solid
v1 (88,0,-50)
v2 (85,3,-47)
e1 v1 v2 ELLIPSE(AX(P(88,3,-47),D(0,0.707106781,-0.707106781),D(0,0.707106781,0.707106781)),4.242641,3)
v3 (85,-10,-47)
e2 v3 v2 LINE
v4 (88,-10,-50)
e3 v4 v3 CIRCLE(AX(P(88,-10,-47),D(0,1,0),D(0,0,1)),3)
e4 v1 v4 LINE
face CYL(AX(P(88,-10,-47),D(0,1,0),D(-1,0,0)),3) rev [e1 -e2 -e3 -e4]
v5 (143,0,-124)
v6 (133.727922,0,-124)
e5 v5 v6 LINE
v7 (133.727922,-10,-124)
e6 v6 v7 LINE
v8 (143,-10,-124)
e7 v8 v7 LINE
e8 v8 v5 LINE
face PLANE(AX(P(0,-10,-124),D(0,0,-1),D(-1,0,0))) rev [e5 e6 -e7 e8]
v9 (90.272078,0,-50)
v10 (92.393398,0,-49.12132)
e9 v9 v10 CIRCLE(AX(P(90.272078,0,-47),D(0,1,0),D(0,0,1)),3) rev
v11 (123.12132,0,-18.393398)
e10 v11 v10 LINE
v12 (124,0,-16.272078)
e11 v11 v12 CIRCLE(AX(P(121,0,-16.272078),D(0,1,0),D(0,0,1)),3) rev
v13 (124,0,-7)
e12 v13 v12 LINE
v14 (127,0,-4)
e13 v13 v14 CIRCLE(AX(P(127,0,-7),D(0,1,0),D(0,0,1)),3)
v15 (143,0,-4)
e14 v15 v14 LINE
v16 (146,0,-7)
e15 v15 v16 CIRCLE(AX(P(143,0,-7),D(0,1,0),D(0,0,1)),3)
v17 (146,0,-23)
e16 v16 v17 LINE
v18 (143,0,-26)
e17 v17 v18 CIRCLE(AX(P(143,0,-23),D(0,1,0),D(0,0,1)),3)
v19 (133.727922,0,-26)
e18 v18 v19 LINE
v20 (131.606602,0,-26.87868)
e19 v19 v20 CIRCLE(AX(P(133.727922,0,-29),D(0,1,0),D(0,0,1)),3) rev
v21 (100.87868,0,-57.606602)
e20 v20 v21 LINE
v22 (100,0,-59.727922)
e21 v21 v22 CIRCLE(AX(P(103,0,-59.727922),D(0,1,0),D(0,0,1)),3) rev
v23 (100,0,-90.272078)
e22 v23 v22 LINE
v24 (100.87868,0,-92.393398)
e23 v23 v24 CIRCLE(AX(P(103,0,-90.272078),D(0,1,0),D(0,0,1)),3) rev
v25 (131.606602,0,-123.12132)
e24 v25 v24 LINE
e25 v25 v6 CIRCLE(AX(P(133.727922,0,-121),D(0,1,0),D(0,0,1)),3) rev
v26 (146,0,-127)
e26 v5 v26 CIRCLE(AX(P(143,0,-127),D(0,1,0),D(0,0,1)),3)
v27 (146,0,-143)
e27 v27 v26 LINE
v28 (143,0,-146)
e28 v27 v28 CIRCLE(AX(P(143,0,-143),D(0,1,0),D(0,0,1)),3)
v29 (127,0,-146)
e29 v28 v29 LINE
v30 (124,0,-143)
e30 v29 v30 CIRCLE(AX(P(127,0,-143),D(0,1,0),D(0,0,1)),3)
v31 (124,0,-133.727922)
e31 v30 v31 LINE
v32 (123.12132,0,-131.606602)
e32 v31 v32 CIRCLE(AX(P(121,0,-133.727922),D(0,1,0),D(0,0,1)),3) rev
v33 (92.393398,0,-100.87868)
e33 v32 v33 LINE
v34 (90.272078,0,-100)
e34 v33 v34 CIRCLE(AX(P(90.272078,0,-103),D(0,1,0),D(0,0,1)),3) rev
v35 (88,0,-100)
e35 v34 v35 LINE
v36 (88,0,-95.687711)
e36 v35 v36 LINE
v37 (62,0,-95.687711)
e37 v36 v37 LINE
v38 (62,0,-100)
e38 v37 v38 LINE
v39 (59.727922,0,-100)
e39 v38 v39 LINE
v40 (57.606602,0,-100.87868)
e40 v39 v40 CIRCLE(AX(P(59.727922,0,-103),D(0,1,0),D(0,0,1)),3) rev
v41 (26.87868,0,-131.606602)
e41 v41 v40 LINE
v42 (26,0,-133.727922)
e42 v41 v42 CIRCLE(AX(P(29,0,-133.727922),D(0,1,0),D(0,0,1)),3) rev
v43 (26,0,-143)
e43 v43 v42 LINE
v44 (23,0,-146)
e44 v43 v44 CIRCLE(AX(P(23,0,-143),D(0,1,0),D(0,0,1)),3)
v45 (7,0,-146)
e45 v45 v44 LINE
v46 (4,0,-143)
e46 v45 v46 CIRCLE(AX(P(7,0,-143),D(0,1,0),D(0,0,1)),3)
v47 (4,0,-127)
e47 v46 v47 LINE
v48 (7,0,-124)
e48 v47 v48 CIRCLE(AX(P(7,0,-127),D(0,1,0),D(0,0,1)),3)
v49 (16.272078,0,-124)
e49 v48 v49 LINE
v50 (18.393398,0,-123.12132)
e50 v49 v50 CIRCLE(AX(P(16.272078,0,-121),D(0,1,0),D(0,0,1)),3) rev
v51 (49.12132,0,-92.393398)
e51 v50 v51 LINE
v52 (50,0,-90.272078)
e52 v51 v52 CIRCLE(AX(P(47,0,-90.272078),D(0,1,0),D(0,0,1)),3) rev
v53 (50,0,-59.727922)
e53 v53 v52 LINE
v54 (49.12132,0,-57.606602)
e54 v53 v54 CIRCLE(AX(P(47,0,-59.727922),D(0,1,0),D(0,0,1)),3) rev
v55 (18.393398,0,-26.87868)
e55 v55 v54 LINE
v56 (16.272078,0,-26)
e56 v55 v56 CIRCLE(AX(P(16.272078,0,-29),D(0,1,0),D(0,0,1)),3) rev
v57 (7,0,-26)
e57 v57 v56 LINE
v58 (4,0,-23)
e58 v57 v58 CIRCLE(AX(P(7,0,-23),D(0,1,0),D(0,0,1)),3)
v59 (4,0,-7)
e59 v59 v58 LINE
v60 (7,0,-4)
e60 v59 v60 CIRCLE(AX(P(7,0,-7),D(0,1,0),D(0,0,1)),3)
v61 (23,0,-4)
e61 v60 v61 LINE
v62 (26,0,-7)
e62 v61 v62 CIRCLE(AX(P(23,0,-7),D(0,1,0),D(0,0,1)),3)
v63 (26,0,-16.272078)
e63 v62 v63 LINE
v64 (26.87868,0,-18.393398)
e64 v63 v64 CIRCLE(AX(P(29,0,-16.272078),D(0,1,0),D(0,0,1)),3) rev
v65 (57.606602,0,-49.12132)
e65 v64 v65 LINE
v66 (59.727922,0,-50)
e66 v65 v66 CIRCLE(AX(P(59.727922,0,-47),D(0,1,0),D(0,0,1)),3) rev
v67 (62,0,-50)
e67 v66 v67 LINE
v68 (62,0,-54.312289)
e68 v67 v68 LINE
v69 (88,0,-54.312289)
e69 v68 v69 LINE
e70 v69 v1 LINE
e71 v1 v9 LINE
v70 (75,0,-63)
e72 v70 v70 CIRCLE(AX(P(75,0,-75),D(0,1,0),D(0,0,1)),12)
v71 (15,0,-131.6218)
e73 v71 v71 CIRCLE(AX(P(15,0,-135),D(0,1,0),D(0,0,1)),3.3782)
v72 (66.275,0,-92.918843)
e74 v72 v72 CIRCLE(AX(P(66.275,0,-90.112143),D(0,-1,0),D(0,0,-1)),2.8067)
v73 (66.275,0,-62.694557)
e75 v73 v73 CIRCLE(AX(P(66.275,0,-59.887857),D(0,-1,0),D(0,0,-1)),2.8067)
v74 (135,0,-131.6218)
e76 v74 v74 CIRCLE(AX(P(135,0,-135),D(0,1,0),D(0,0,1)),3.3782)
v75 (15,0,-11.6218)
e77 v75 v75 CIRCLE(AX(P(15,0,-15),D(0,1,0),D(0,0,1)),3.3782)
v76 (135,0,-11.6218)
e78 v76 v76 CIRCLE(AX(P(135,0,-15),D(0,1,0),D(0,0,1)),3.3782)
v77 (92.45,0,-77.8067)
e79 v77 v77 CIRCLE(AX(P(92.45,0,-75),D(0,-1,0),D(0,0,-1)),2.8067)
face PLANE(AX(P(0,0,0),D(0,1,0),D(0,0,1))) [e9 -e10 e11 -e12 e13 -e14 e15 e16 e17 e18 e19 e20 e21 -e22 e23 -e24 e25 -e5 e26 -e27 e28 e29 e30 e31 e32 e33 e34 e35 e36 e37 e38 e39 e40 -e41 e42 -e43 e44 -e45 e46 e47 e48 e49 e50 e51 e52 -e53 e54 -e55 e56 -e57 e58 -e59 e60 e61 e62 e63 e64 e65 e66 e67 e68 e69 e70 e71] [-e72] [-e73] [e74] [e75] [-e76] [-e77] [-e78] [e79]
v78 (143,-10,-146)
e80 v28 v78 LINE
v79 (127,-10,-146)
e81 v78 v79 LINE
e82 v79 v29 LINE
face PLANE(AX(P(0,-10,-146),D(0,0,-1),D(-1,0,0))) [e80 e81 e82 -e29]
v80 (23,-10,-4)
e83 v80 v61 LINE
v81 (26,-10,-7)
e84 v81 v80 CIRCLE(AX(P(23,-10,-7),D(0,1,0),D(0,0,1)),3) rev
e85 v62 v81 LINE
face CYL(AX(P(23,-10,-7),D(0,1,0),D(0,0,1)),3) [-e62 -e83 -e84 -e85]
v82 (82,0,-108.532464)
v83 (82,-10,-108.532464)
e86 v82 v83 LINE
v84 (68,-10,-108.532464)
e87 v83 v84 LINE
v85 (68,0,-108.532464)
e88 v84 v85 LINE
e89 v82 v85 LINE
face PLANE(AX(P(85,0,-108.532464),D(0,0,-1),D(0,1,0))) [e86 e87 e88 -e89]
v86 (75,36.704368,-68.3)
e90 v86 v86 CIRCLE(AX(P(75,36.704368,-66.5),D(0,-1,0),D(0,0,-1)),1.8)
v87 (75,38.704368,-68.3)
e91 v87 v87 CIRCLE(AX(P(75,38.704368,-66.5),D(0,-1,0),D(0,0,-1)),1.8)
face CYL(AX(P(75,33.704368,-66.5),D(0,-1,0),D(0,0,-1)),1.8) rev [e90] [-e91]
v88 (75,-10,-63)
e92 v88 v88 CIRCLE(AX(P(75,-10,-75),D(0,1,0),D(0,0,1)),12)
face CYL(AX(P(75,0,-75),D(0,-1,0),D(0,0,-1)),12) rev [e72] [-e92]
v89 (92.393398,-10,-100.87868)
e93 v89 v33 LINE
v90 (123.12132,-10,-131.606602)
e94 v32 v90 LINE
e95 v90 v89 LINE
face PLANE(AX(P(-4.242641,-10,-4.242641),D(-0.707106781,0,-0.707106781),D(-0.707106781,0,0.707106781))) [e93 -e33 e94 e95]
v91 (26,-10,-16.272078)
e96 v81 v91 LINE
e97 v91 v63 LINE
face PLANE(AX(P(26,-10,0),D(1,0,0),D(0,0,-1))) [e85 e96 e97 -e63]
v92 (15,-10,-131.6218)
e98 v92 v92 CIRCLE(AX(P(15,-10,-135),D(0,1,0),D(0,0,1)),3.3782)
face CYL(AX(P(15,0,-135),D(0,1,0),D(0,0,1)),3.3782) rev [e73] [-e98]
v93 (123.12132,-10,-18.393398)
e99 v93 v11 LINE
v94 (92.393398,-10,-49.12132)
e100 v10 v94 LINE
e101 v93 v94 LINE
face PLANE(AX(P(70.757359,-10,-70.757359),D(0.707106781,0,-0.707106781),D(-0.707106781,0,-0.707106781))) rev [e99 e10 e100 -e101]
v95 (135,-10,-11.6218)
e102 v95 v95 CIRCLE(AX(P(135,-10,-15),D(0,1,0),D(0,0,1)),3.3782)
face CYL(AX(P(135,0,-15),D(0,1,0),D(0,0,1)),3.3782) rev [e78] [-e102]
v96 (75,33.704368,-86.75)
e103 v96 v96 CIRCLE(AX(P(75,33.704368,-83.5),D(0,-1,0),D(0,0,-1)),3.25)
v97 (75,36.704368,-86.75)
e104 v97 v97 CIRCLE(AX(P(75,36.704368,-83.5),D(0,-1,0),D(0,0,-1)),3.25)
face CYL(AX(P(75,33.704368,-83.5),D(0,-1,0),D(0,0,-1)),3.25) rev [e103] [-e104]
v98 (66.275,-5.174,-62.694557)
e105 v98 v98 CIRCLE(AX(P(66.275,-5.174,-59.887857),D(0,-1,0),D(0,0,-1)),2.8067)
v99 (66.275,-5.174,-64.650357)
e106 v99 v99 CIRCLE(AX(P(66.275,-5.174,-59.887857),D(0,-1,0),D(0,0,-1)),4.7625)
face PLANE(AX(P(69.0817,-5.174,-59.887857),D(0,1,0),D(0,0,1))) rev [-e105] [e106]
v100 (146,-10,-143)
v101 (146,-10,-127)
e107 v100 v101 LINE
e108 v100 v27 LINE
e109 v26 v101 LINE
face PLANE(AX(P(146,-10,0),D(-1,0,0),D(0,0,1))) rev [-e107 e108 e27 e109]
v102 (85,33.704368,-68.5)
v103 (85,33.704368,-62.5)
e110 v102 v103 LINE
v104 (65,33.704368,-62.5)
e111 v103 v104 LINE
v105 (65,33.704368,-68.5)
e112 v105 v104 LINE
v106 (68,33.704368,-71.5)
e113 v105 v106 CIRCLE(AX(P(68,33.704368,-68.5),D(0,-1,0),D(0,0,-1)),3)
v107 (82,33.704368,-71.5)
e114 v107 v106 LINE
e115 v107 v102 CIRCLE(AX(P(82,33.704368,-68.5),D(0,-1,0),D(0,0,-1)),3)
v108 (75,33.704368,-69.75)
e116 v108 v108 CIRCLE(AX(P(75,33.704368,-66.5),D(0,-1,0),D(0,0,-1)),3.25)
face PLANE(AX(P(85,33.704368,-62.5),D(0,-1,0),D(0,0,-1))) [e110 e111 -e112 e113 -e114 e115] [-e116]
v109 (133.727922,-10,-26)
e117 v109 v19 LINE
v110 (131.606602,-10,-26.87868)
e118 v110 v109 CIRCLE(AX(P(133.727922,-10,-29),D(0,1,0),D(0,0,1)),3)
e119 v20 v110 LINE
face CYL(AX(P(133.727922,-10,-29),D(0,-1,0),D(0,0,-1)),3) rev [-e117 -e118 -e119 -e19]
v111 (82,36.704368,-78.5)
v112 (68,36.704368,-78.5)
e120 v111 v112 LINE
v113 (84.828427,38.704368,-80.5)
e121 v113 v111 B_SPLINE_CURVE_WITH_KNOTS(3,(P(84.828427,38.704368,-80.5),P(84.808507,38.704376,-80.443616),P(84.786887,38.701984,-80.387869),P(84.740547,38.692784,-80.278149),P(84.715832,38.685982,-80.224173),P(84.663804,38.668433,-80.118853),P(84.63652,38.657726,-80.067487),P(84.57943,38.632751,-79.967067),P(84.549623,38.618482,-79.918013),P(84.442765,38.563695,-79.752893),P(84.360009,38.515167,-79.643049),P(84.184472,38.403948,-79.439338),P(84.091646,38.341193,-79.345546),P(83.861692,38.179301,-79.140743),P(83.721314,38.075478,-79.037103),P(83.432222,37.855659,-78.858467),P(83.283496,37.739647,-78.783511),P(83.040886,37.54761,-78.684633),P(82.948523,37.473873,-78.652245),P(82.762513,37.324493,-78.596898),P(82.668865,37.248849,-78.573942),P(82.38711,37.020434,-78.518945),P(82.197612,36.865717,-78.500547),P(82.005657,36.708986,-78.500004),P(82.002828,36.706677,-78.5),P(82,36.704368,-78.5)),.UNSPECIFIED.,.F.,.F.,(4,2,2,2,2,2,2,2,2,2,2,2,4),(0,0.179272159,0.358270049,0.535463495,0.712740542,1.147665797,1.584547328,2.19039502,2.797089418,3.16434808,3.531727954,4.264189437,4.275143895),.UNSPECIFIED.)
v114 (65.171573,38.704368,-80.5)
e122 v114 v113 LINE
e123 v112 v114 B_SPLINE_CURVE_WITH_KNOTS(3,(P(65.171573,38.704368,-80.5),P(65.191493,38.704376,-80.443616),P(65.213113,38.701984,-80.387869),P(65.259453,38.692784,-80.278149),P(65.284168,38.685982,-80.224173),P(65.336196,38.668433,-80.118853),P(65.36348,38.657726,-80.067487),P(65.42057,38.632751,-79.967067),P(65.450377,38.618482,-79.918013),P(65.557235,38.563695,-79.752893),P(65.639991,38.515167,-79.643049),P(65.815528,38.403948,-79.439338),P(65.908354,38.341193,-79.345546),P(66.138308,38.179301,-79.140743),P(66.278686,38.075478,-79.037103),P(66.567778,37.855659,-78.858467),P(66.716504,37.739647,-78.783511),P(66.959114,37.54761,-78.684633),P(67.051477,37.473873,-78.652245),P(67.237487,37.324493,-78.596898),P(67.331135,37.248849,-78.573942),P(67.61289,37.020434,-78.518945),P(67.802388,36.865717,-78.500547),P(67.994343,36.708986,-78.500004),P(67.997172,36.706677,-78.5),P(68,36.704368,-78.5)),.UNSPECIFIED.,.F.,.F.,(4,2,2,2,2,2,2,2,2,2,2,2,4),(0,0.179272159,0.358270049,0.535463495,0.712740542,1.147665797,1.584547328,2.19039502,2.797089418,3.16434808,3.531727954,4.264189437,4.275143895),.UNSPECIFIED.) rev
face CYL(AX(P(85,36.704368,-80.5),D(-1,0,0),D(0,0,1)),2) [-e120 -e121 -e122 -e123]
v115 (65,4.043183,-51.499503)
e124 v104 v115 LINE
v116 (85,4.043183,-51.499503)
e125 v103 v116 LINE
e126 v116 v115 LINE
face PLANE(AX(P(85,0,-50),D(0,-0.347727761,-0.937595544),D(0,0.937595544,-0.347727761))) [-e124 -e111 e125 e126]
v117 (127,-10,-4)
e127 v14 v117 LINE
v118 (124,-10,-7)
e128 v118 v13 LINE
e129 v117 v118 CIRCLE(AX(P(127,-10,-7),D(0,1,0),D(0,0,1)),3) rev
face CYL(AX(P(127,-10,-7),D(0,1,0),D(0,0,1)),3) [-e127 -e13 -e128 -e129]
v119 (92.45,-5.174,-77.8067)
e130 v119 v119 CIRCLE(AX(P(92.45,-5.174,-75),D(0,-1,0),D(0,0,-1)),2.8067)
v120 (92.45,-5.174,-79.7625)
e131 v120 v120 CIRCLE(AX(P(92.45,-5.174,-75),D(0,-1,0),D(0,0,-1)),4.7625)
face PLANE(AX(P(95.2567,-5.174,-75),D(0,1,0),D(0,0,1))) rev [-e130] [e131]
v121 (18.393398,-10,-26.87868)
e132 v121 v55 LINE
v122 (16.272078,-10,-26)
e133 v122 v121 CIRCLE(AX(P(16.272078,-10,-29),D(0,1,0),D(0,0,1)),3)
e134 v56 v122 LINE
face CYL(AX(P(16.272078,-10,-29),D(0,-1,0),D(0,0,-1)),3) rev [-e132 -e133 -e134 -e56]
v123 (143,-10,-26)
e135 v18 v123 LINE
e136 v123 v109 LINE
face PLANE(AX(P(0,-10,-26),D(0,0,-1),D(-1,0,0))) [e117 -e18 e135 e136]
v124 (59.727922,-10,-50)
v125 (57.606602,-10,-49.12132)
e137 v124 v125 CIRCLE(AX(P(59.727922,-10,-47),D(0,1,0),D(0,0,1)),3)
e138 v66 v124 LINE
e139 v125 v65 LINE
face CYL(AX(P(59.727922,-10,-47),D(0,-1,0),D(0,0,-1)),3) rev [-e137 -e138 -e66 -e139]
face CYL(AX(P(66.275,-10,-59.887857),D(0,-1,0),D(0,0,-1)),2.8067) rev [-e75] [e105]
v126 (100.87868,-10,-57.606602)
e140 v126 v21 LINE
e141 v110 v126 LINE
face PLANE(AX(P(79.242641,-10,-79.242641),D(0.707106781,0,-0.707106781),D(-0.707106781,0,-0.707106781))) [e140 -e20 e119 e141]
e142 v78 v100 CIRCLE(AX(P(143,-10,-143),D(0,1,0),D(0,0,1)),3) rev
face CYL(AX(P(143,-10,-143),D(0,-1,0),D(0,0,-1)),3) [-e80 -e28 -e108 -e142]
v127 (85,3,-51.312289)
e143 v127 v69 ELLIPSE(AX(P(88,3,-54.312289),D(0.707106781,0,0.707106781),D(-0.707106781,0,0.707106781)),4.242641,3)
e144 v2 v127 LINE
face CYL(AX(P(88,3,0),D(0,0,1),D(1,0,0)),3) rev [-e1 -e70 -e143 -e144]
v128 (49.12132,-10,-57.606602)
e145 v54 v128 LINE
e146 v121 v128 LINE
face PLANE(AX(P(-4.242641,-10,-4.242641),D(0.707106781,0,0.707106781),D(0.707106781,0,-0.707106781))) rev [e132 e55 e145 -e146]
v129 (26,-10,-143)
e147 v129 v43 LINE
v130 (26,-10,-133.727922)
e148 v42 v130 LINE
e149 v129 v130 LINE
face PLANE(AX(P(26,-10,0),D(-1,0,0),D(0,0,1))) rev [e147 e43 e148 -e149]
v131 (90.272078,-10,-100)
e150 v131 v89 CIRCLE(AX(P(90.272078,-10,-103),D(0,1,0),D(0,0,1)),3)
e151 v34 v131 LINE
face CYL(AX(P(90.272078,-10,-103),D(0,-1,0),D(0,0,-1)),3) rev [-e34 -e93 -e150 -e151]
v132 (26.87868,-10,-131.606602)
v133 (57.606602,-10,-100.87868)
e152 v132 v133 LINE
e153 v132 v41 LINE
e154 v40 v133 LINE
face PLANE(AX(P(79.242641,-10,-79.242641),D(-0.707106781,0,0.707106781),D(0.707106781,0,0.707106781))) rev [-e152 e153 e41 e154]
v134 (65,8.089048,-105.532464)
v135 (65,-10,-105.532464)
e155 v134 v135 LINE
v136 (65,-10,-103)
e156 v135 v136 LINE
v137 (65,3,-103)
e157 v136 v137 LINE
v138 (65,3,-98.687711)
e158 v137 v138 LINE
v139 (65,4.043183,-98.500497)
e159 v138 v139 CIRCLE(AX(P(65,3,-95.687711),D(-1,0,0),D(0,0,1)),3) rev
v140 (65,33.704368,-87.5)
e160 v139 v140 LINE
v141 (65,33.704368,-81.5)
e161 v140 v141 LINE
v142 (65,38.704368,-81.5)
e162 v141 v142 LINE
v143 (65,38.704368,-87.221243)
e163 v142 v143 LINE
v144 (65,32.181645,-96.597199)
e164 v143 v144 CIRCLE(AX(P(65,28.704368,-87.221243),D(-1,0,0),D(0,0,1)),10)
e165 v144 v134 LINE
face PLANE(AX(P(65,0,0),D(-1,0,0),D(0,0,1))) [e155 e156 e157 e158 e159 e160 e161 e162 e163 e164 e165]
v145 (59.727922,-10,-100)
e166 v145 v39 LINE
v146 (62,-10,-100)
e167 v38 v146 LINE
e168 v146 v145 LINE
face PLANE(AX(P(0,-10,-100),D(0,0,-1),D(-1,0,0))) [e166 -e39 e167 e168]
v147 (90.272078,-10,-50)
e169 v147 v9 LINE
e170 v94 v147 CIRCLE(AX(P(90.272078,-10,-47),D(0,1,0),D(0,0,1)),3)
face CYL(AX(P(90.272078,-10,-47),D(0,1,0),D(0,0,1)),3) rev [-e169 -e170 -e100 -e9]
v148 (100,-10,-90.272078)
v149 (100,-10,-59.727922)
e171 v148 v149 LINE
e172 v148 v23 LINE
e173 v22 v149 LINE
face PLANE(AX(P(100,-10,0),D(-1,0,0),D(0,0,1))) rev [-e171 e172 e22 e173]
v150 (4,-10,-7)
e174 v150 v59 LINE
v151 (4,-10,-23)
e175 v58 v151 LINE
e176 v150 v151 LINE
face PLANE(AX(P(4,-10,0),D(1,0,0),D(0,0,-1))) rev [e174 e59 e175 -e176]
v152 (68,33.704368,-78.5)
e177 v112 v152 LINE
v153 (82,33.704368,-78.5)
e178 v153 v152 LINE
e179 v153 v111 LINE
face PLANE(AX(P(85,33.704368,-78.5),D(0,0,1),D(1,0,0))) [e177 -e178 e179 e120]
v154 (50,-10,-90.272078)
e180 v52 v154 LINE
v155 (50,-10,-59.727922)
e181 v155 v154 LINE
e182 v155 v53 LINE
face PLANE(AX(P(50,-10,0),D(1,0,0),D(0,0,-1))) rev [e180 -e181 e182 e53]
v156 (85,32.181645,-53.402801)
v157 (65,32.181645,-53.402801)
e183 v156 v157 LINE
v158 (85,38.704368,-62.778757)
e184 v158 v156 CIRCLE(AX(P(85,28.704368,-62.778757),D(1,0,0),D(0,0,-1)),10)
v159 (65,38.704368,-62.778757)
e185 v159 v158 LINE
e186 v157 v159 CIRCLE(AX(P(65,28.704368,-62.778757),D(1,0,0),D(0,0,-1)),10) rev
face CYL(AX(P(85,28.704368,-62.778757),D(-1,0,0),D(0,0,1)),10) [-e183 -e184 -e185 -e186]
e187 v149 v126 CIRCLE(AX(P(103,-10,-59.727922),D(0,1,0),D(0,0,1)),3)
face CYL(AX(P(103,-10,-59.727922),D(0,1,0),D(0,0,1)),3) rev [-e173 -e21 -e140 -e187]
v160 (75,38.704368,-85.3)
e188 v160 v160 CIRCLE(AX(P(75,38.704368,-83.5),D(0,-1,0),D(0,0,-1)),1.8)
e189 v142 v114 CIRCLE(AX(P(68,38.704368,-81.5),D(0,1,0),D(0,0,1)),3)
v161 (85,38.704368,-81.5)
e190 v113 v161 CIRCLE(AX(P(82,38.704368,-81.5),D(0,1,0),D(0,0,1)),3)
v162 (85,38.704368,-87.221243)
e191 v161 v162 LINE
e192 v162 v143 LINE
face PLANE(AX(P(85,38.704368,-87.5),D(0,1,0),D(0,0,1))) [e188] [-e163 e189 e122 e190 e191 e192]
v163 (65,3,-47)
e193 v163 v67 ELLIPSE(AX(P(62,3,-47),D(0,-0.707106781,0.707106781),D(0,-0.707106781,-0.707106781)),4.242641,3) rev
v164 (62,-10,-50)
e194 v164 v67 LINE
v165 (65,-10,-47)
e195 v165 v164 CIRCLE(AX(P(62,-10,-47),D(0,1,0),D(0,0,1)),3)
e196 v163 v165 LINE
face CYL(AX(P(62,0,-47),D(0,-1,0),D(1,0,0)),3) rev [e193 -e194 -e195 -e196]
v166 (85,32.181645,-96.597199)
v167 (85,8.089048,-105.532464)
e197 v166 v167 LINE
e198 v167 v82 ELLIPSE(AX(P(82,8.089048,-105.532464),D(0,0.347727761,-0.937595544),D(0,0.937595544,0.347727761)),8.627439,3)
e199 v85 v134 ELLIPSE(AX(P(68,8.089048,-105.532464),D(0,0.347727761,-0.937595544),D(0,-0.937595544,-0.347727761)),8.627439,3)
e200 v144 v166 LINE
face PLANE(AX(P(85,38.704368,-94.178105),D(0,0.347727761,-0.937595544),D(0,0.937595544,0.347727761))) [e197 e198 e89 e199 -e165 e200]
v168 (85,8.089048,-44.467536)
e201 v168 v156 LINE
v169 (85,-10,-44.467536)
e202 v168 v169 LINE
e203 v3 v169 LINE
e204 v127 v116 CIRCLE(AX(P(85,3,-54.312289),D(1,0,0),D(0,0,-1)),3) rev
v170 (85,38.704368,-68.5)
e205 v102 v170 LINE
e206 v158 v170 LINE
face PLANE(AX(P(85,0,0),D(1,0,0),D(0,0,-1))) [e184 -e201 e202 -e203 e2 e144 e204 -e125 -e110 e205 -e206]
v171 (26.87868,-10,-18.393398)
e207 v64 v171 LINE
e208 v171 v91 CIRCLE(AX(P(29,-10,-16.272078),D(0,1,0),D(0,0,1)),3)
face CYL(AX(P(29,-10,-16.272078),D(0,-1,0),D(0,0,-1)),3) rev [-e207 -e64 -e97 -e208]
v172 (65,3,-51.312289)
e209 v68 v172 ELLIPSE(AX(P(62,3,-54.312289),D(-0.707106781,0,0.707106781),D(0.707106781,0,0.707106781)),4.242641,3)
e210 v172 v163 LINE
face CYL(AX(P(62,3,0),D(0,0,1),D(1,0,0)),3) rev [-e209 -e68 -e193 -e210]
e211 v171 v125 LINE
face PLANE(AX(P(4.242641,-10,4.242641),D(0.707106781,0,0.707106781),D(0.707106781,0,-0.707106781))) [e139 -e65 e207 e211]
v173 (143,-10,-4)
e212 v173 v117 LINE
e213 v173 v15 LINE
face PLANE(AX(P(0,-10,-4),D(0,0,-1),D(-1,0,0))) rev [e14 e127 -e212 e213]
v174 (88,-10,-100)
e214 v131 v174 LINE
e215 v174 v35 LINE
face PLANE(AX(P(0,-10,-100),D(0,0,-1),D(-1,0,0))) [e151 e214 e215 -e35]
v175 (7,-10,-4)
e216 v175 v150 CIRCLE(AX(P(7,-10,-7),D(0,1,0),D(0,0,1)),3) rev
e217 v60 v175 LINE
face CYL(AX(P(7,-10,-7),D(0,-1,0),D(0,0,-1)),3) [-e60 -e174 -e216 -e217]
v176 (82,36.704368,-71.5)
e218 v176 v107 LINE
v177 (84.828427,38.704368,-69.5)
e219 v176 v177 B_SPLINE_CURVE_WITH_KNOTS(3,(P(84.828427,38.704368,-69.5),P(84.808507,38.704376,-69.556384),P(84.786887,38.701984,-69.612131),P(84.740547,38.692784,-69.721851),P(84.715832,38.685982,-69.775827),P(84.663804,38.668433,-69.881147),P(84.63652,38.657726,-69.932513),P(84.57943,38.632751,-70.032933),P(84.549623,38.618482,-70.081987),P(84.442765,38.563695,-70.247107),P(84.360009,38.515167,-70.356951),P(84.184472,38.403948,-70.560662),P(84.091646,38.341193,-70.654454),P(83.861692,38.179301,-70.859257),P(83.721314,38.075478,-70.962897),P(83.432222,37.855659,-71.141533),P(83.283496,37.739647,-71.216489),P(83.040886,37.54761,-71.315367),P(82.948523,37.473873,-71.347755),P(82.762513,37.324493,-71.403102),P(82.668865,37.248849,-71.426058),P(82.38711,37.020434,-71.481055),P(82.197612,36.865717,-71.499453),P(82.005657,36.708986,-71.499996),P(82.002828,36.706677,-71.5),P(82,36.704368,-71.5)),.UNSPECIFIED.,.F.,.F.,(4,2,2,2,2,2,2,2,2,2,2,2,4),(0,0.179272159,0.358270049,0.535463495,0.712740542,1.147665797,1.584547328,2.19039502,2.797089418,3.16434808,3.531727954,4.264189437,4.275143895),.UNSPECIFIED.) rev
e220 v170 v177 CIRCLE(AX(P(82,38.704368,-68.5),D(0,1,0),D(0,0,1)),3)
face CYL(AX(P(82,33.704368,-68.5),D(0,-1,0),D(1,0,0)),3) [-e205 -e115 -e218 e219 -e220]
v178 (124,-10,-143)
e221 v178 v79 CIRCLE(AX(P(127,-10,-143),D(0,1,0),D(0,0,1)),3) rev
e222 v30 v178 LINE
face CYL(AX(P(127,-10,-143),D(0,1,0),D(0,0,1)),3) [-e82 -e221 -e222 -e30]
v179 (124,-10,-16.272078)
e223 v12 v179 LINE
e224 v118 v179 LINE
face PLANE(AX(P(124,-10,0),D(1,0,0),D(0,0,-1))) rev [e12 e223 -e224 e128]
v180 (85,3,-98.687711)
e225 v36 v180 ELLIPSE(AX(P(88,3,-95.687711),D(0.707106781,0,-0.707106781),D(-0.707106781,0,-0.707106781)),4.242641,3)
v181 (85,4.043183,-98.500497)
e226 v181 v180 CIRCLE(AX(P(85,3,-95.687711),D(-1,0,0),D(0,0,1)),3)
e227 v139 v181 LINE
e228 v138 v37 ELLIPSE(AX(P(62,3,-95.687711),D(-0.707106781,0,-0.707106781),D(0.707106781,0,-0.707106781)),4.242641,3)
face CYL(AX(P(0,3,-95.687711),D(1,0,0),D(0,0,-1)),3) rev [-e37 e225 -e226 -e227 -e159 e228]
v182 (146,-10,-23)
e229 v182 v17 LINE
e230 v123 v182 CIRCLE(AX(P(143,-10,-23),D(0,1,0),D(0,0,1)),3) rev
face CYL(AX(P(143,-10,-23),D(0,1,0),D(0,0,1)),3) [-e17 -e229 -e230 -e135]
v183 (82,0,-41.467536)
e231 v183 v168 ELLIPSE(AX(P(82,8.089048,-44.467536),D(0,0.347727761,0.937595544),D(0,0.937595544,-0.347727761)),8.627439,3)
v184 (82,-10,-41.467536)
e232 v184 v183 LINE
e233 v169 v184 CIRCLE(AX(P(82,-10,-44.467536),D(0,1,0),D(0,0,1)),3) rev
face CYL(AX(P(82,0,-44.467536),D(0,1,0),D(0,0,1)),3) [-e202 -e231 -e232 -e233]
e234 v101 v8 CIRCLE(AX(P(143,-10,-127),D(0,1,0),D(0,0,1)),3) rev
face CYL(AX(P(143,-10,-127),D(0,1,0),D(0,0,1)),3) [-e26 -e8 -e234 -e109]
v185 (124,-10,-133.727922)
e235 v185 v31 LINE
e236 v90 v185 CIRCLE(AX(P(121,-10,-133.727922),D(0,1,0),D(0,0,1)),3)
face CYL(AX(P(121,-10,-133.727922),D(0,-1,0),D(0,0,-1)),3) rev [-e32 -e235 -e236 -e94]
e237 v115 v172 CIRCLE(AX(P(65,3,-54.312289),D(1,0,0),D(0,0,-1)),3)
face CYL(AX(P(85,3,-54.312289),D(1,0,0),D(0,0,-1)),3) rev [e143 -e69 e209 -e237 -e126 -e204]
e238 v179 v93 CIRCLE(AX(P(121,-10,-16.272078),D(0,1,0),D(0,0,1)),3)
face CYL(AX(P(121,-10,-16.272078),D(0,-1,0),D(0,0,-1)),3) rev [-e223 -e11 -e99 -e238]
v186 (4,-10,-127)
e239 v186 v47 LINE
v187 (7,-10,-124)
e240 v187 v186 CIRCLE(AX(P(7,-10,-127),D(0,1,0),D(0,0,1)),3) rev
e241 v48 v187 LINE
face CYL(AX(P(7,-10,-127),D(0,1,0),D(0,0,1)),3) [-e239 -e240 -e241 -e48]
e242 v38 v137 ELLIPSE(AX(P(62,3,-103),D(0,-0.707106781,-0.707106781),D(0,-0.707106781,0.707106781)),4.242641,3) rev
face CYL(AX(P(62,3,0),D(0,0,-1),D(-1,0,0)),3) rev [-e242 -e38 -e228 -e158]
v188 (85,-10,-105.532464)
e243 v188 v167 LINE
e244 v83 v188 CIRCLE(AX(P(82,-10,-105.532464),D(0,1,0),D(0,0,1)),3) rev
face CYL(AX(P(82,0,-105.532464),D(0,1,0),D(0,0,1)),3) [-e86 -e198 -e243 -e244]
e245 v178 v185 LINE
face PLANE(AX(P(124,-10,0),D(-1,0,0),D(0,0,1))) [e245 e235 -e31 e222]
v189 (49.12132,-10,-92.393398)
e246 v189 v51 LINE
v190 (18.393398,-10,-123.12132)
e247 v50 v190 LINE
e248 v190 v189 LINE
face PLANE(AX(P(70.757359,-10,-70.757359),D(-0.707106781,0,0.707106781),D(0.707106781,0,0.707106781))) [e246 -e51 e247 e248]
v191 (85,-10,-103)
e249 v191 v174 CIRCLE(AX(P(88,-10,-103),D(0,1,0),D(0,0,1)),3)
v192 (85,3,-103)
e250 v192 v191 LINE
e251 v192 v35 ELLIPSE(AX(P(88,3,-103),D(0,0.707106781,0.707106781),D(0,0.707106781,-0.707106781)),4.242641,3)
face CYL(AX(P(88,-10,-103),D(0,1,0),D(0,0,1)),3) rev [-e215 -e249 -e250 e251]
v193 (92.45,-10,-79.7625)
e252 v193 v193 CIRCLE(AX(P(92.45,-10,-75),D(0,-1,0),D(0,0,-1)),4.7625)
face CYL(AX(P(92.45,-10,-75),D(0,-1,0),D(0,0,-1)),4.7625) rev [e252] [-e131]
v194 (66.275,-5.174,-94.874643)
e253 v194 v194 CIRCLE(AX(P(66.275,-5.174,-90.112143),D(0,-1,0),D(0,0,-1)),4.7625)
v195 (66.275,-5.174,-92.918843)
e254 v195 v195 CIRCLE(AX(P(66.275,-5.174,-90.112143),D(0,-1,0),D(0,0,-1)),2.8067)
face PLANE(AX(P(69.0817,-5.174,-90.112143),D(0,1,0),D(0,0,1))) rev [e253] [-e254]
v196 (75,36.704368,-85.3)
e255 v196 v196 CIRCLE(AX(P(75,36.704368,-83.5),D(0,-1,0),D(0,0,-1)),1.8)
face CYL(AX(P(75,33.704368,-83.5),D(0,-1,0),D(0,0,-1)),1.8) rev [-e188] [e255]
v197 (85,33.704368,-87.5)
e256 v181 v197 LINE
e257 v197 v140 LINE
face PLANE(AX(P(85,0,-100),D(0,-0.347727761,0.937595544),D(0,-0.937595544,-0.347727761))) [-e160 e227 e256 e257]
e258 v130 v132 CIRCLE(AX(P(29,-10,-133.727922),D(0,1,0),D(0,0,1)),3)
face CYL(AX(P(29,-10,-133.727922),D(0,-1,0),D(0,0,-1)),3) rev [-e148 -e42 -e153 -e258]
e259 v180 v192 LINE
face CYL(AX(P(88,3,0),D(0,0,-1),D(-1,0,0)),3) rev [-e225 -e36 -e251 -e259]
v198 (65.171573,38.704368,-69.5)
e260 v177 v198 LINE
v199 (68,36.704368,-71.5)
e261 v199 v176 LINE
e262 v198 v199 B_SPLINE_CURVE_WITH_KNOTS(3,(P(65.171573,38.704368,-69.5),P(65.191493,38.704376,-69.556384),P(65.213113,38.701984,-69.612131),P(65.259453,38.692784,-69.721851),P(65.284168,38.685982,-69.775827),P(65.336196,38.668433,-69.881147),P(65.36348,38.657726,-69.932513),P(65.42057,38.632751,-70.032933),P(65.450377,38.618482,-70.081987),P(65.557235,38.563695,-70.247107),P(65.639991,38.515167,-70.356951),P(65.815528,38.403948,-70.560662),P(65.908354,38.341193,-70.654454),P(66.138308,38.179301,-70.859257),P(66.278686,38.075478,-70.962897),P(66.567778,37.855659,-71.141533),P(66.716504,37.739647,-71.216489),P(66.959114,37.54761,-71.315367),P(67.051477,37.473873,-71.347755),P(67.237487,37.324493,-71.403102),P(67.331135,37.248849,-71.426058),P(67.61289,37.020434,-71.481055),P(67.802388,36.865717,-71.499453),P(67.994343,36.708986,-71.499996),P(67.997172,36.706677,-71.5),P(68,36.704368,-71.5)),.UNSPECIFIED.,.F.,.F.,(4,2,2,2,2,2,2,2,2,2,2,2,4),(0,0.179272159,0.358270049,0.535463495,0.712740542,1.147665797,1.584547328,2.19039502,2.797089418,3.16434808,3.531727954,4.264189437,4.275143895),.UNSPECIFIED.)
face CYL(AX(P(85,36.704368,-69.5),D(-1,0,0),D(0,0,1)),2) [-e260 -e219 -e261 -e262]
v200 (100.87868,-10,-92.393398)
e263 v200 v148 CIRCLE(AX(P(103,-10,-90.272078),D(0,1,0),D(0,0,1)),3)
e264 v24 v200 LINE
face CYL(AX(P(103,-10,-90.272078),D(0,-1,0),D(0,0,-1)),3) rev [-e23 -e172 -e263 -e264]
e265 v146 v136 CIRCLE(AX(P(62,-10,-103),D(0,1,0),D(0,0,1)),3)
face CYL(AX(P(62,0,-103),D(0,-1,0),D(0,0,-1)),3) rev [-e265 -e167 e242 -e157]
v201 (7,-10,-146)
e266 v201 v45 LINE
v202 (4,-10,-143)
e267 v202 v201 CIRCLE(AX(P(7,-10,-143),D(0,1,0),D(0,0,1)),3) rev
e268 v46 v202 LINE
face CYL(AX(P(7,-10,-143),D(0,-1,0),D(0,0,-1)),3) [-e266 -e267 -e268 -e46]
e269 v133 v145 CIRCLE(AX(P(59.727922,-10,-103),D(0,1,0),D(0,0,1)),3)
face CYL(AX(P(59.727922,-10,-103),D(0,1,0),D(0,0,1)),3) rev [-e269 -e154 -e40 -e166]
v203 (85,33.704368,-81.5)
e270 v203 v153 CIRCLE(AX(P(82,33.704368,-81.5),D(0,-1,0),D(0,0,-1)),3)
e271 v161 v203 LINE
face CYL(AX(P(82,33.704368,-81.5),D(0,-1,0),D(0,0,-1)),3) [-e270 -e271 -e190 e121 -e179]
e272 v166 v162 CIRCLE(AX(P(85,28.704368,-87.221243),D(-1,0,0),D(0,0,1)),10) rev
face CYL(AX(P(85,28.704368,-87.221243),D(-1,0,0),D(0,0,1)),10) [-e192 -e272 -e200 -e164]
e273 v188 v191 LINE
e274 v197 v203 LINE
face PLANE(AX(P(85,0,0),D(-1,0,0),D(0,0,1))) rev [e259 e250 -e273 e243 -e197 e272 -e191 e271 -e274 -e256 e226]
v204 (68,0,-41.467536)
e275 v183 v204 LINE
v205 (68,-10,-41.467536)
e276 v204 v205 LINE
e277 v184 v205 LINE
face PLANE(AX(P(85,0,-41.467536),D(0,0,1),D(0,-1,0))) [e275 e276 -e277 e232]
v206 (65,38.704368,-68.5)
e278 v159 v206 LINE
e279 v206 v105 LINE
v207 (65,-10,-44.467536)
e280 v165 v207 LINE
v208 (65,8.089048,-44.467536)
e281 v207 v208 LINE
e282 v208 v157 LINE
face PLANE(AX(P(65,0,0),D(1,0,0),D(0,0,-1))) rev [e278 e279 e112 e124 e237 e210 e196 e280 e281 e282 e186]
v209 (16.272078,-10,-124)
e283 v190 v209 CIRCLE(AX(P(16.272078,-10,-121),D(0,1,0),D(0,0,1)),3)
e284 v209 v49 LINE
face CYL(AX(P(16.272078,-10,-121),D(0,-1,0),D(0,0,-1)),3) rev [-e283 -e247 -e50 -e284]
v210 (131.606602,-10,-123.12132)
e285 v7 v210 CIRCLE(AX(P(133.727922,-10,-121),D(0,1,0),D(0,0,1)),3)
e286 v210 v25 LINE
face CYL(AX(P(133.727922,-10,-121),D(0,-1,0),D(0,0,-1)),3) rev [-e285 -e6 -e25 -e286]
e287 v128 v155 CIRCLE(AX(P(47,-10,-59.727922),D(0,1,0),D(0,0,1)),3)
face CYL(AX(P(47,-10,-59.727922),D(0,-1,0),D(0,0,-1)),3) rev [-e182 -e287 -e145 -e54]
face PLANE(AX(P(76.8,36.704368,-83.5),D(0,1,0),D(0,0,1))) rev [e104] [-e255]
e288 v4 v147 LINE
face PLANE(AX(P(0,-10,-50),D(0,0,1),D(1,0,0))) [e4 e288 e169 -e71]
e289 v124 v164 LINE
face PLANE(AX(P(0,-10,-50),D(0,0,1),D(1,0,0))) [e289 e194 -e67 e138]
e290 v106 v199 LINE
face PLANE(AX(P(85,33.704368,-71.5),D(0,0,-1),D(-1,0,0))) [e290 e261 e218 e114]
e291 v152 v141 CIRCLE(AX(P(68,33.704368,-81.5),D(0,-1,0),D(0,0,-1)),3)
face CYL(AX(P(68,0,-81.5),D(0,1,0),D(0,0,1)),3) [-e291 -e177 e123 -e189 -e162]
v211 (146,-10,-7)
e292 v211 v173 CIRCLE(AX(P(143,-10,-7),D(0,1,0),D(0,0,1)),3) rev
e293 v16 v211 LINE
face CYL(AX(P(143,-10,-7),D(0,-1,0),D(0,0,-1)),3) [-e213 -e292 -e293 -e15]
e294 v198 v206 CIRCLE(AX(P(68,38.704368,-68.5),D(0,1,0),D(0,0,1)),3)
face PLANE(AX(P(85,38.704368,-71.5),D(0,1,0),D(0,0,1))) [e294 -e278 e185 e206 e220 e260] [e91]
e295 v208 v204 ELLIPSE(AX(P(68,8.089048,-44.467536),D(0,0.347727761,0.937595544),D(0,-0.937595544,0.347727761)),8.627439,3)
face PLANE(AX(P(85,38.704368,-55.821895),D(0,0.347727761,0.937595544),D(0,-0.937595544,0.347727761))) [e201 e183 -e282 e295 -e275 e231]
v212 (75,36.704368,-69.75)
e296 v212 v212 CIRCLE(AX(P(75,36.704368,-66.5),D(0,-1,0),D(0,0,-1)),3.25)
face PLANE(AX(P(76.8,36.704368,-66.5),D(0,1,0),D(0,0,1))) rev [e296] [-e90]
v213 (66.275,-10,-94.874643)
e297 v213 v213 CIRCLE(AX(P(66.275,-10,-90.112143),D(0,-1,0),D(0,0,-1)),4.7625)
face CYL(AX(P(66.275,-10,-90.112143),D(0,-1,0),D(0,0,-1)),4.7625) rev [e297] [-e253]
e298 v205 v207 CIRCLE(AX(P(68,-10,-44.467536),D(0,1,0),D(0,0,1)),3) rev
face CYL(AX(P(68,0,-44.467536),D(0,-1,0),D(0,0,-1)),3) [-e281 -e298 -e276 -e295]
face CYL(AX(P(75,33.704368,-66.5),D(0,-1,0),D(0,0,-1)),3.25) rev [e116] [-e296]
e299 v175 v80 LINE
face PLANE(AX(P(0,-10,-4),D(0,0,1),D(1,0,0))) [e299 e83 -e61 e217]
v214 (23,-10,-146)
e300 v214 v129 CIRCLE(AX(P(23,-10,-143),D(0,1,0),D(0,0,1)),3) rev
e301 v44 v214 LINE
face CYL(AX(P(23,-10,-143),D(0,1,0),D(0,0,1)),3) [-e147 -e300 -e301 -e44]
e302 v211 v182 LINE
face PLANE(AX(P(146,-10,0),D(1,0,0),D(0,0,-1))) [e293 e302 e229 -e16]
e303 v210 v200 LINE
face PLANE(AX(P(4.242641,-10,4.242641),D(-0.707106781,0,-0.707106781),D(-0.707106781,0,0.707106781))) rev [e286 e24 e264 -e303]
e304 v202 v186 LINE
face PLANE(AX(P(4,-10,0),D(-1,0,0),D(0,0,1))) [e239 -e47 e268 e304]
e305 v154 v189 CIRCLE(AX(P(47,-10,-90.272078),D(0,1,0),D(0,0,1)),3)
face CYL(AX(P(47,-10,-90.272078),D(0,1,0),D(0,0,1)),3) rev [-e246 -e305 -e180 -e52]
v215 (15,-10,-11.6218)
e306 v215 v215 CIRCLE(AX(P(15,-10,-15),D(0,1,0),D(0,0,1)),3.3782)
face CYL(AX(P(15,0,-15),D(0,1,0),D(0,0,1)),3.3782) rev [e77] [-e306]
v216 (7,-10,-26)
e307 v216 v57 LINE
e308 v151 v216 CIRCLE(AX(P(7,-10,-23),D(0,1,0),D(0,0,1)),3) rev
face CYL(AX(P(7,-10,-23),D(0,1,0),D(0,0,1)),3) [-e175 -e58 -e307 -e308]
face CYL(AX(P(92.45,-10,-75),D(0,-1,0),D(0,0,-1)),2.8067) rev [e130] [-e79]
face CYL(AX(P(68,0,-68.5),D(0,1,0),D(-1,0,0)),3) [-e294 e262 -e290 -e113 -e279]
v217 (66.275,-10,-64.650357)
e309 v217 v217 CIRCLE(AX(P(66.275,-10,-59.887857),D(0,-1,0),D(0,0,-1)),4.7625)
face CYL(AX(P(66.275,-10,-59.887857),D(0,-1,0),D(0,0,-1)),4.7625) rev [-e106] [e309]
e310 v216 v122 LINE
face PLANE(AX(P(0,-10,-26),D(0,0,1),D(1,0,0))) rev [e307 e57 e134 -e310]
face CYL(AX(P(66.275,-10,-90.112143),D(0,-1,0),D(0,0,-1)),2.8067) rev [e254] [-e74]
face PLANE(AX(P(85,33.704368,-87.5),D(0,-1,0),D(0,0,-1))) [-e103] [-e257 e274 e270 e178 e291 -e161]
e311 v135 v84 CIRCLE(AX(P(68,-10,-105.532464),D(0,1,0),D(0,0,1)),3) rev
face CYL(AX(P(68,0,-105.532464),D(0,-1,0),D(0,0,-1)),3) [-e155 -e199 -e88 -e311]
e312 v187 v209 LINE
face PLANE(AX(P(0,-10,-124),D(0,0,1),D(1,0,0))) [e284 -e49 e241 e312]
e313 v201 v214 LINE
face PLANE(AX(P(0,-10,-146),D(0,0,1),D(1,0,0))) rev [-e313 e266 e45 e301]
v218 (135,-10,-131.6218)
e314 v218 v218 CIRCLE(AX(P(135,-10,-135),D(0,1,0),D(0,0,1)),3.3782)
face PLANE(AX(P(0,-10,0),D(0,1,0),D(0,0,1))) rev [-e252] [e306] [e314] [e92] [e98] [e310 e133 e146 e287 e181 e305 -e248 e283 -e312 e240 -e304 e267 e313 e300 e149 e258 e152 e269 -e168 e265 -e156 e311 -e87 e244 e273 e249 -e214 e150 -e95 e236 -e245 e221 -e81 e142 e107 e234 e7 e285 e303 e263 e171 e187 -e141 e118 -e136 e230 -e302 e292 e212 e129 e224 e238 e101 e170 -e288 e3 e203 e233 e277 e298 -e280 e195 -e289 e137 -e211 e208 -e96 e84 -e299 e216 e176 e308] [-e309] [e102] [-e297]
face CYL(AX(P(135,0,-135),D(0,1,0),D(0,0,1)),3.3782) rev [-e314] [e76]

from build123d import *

# Parameters (mm, degrees)
SKETCH1_W                                       = 22
SKETCH1_H                                       = 22
BOSS_EXTRUDE1_DEPTH                             = 10
F_1_4_CLEARANCE_HOLE1_D                         = 6.7564
SKETCH6_R                                       = 4
CUT_EXTRUDE1_DEPTH                              = 207.717198123
SKETCH7_R                                       = 12
CUT_EXTRUDE2_DEPTH                              = 207.717198123
CBORE_FOR_10_SOCKET_HEAD_CAP_SCREW1_D           = 5.6134
CBORE_FOR_10_SOCKET_HEAD_CAP_SCREW1_CBORE_D     = 9.525
CBORE_FOR_10_SOCKET_HEAD_CAP_SCREW1_CBORE_DEPTH = 4.826
BOSS_EXTRUDE2_DEPTH                             = 10
BOSS_EXTRUDE2_DEPTH_BACK                        = 10
CBORE_FOR_M3_SHCS1_D                            = 3.6
CBORE_FOR_M3_SHCS1_CBORE_D                      = 6.5
CBORE_FOR_M3_SHCS1_CBORE_DEPTH                  = 3
FILLET1_R                                       = 3
FILLET2_R                                       = 3
FILLET3_R                                       = 10
FILLET4_R                                       = 2


with BuildPart() as part:
    # Sketch1 → Boss-Extrude1 (new body)
    with BuildSketch(Plane(origin=(0, 0, 0), x_dir=(1, 0, 0), z_dir=(0, 1, 0))):
        with Locations((15, 15)):
            Rectangle(SKETCH1_W, SKETCH1_H)
        Polygon((50, 50), (50, 58.485281374), (17.514718626, 26), (26, 26), (26, 17.514718626), (58.485281374, 50), align=None)
        Polygon((50, 75), (50, 100), (75, 100), (100, 100), (100, 50), (75, 50), (50, 50), align=None)
        Polygon((100, 50), (91.514718626, 50), (124, 17.514718626), (124, 26), (132.485281374, 26), (100, 58.485281374), align=None)
        with Locations((135, 15)):
            Rectangle(SKETCH1_W, SKETCH1_H)
        with Locations((135, 135)):
            Rectangle(SKETCH1_W, SKETCH1_H)
        Polygon((124, 132.485281374), (91.514718626, 100), (100, 100), (100, 91.514718626), (132.485281374, 124), (124, 124), align=None)
        Polygon((17.514718626, 124), (50, 91.514718626), (50, 100), (58.485281374, 100), (26, 132.485281374), (26, 124), align=None)
        with Locations((15, 135)):
            Rectangle(SKETCH1_W, SKETCH1_H)
    extrude(amount=-BOSS_EXTRUDE1_DEPTH)

    # 1/4 Clearance Hole1 (through all)
    with Locations(Plane(origin=(0, 0, 0), x_dir=(1, 0, 0), z_dir=(0, 1, 0))):
        with Locations((15, 15), (15, 135), (135, 135), (135, 15)):
            Hole(F_1_4_CLEARANCE_HOLE1_D / 2)

    # Sketch6 → Cut-Extrude1 (cut, through all)
    with BuildSketch(Plane.XZ.offset(10)):
        with Locations(Location((75, -75, 0), (0, 0, 270))):
            Circle(SKETCH6_R)
    extrude(amount=-CUT_EXTRUDE1_DEPTH, mode=Mode.SUBTRACT)

    # Sketch7 → Cut-Extrude2 (cut, through all)
    with BuildSketch(Plane(origin=(0, -10, 0), x_dir=(1, 0, 0), z_dir=(0, 1, 0))):
        with Locations(Location((75, 75, 0), (0, 0, 270))):
            Circle(SKETCH7_R)
    extrude(amount=CUT_EXTRUDE2_DEPTH, mode=Mode.SUBTRACT)

    # CBORE for #10 Socket Head Cap Screw1 (through all)
    with Locations(Plane(origin=(0, -10, 0), x_dir=(-1, 0, 0), z_dir=(0, -1, 0))):
        with Locations((-92.45, 75), (-66.275, 59.887856704), (-66.275, 90.112143296)):
            CounterBoreHole(CBORE_FOR_10_SOCKET_HEAD_CAP_SCREW1_D / 2, CBORE_FOR_10_SOCKET_HEAD_CAP_SCREW1_CBORE_D / 2, CBORE_FOR_10_SOCKET_HEAD_CAP_SCREW1_CBORE_DEPTH)

    # Sketch10 → Boss-Extrude2 (add, two sides: drawn at the far end of the back side and taken through both)
    with BuildSketch(Plane.ZY.offset(-75).offset(-BOSS_EXTRUDE2_DEPTH_BACK)):
        Polygon((-100, -10), (-100, 0), (-87.5, 33.704367651), (-78.5, 33.704367651), (-78.5, 38.704367651), (-87.5, 38.704367651), (-94.178104684, 38.704367651), (-108.532463759, 0), (-108.532463759, -10), align=None)
        Polygon((-71.5, 33.704367651), (-71.5, 38.704367651), (-62.5, 38.704367651), (-55.821895316, 38.704367651), (-41.467536241, 0), (-41.467536241, -10), (-50, -10), (-50, 0), (-62.5, 33.704367651), align=None)
    extrude(amount=BOSS_EXTRUDE2_DEPTH + BOSS_EXTRUDE2_DEPTH_BACK)

    # CBORE for M3 SHCS1 (through all)
    with Locations(Plane(origin=(0, 33.704367651, 0), x_dir=(-1, 0, 0), z_dir=(0, -1, 0))):
        with Locations((-75, 83.5), (-75, 66.5)):
            CounterBoreHole(CBORE_FOR_M3_SHCS1_D / 2, CBORE_FOR_M3_SHCS1_CBORE_D / 2, CBORE_FOR_M3_SHCS1_CBORE_DEPTH)

    # Fillet1
    fillet1_edges = [part.edges().sort_by_distance(p)[0] for p in [
        (85, -5, -108.532463759),
        (85, 36.204367651, -78.5),
        (85, -5, -100),
        (65, -5, -100),
        (65, 36.204367651, -78.5),
        (65, -5, -108.532463759),
        (85, -5, -50),
        (85, 36.204367651, -71.5),
        (85, -5, -41.467536241),
        (65, -5, -41.467536241),
        (65, 36.204367651, -71.5),
        (65, -5, -50),
        (100, -5, -58.485281374),
        (132.485281374, -5, -26),
        (146, -5, -26),
        (146, -5, -4),
        (124, -5, -4),
        (124, -5, -17.514718626),
        (91.514718626, -5, -50),
        (58.485281374, -5, -50),
        (26, -5, -17.514718626),
        (26, -5, -4),
        (4, -5, -4),
        (4, -5, -26),
        (17.514718626, -5, -26),
        (50, -5, -58.485281374),
        (50, -5, -91.514718626),
        (17.514718626, -5, -124),
        (4, -5, -124),
        (4, -5, -146),
        (26, -5, -146),
        (26, -5, -132.485281374),
        (58.485281374, -5, -100),
        (91.514718626, -5, -100),
        (124, -5, -132.485281374),
        (124, -5, -146),
        (146, -5, -146),
        (146, -5, -124),
        (132.485281374, -5, -124),
        (100, -5, -91.514718626),
    ]]
    fillet(fillet1_edges, radius=FILLET1_R)

    # Fillet2
    fillet2_edges = [part.edges().sort_by_distance(p)[0] for p in [
        (85, 0, -48.5),
        (85, 0, -101.5),
        (65, 0, -48.5),
        (65, 0, -101.5),
        (75, 0, -50),
        (75, 0, -100),
    ]]
    fillet(fillet2_edges, radius=FILLET2_R)

    # Fillet3
    fillet3_edges = [part.edges().sort_by_distance(p)[0] for p in [
        (75, 38.704367651, -94.178104684),
        (75, 38.704367651, -55.821895316),
    ]]
    fillet(fillet3_edges, radius=FILLET3_R)

    # Fillet4
    # the kernel refuses this fillet: 2 mm, written as the material it takes off along each edge
    with BuildSketch(Plane(origin=(63, 38.704367651, -71.5), x_dir=(0, 0, 1), z_dir=(1, 0, 0)), Plane(origin=(87, 38.704367651, -78.5), x_dir=(0, 0, -1), z_dir=(-1, 0, 0))) as fillet4_piece_1:
        with BuildLine():
            CenterArc((FILLET4_R, FILLET4_R), FILLET4_R, 180, 90)
            Line((0, FILLET4_R), (0, 0))
            Line((0, 0), (FILLET4_R, 0))
        make_face()
    extrude(amount=24, mode=Mode.SUBTRACT)


solid = part.part
